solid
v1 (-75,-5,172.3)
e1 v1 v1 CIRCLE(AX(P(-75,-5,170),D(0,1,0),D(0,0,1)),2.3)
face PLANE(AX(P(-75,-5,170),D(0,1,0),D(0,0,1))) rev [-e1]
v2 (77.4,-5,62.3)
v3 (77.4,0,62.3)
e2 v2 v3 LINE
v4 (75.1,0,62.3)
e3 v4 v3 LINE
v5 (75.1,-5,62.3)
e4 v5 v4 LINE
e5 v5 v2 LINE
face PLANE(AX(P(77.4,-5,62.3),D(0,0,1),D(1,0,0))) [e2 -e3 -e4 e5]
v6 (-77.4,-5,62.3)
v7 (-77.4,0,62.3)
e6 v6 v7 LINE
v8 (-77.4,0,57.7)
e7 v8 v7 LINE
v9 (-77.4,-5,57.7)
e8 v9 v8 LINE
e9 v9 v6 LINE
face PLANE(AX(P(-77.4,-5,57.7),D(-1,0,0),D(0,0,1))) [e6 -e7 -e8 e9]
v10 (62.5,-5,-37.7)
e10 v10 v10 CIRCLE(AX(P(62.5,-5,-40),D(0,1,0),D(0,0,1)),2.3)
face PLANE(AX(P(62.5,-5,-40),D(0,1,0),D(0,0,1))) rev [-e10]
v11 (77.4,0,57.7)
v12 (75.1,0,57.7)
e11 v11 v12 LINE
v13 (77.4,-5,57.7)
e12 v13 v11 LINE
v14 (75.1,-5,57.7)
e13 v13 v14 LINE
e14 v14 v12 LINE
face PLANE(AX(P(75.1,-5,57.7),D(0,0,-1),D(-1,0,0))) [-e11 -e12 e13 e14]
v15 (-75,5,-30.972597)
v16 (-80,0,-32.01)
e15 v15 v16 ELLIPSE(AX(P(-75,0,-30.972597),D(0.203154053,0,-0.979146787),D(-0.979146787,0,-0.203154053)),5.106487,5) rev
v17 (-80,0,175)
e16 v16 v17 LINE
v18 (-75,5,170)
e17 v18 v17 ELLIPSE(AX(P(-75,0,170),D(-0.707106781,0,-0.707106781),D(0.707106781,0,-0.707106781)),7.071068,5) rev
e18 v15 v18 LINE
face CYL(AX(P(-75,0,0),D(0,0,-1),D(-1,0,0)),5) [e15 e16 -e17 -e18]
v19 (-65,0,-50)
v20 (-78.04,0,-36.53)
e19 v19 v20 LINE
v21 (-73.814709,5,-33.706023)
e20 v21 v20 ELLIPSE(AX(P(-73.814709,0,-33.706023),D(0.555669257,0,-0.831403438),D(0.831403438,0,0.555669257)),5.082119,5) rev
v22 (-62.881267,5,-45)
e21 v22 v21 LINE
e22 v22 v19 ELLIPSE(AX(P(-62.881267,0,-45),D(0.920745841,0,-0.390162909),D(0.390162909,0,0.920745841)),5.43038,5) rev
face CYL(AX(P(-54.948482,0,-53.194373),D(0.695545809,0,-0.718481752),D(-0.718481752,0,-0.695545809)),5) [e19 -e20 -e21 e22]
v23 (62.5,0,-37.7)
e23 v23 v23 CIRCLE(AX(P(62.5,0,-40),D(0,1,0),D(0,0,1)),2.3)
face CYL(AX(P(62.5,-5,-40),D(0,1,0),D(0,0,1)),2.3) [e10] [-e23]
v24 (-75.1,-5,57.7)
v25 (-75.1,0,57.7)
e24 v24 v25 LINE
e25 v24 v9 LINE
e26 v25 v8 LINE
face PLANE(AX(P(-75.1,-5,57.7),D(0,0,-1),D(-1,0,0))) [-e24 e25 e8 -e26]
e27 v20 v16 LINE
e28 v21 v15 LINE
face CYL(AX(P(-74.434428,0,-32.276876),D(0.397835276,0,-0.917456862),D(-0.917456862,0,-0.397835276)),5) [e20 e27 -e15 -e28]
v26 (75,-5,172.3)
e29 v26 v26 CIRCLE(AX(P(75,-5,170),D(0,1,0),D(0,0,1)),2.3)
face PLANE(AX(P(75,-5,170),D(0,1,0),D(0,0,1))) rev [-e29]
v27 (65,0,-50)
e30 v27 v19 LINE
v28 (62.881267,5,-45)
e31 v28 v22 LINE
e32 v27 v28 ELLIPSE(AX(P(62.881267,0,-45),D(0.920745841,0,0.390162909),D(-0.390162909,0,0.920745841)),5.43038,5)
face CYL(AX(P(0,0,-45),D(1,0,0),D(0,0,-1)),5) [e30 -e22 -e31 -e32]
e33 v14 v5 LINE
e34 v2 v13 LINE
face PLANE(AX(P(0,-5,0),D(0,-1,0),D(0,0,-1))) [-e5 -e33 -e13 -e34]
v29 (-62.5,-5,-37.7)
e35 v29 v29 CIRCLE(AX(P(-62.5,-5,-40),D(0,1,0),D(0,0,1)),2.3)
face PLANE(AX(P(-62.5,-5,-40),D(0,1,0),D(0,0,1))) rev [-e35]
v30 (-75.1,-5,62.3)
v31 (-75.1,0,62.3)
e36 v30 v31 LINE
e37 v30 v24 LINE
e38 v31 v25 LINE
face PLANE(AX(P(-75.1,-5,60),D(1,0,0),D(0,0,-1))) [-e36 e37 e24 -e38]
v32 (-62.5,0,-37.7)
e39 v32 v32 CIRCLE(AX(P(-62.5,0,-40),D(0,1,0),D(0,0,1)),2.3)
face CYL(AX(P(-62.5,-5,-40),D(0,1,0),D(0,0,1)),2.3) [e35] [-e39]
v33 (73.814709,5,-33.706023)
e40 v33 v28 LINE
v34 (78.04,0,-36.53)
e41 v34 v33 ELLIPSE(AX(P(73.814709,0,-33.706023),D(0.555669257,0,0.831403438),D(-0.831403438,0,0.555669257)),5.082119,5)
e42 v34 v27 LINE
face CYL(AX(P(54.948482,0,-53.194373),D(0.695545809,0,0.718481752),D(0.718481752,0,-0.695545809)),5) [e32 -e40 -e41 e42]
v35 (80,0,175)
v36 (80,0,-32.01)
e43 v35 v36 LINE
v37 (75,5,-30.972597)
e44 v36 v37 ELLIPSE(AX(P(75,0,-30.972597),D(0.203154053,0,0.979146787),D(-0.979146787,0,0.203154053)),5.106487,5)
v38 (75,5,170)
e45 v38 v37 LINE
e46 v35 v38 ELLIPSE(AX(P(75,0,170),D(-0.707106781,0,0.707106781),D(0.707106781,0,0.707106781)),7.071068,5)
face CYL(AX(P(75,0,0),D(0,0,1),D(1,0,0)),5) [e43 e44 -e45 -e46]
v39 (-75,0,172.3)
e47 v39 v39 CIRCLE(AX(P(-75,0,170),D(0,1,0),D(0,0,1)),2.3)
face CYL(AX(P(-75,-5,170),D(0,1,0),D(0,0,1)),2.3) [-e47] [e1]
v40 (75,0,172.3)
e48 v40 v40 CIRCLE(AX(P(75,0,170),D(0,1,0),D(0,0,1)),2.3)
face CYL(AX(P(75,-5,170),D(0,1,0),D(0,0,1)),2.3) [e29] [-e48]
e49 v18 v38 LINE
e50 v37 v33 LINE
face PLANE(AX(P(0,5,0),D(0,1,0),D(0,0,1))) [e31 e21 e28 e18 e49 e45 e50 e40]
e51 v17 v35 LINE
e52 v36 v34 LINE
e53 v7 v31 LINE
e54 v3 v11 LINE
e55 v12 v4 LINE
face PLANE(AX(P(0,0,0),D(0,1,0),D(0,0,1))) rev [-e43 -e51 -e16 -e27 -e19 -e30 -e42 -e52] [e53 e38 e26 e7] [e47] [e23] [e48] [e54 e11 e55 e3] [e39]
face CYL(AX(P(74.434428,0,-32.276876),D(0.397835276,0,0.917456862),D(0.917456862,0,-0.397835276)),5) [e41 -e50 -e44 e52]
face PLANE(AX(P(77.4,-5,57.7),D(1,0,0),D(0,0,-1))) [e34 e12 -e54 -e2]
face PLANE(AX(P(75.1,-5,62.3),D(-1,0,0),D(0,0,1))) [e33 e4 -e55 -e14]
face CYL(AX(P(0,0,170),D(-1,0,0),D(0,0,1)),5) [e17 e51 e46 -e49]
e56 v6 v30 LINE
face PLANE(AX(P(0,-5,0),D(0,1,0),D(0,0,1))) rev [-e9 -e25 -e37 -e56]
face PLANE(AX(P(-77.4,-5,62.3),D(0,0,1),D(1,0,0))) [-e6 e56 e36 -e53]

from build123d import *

# Parameters (mm, degrees)
BOSS_EXTRUDE1_DEPTH = 5
FILLET1_R           = 5
SKETCH3_R           = 2.3
BOSS_EXTRUDE2_DEPTH = 5


with BuildPart() as part:
    # Lid → Boss-Extrude1 (new body)
    with BuildSketch(Plane(origin=(0, 0, 0), x_dir=(1, 0, 0), z_dir=(0, 1, 0))):
        Polygon((-80, -175), (80, -175), (80, 30), (80, 32.01), (78.04, 36.53), (65, 50), (-65, 50), (-78.04, 36.53), (-80, 32.01), (-80, 30), align=None)
    extrude(amount=BOSS_EXTRUDE1_DEPTH)

    # Fillet1
    fillet1_edges = [part.edges().sort_by_distance(p)[0] for p in [
        (0, 5, 175),
        (-79.02, 5, -34.27),
        (-80, 5, 71.495),
        (-71.52, 5, -43.265),
        (0, 5, -50),
        (71.52, 5, -43.265),
        (79.02, 5, -34.27),
        (80, 5, 71.495),
    ]]
    fillet(fillet1_edges, radius=FILLET1_R - 0.0001)  # a hair under: the kernel refuses the full size

    # Sketch3 → Boss-Extrude2 (add)
    with BuildSketch(Plane(origin=(0, 0, 0), x_dir=(1, 0, 0), z_dir=(0, 1, 0))):
        with Locations(Location((-62.5, 40, 0), (0, 0, 270))):
            Circle(SKETCH3_R)
        with Locations(Location((62.5, 40, 0), (0, 0, 270))):
            Circle(SKETCH3_R)
        with Locations(Location((75, -170, 0), (0, 0, 270))):
            Circle(SKETCH3_R)
        with Locations(Location((-75, -170, 0), (0, 0, 270))):
            Circle(SKETCH3_R)
        Polygon((-77.4, -57.7), (-77.4, -62.3), (-75.1, -62.3), (-75.1, -60), (-75.1, -57.7), align=None)
        Polygon((75.1, -57.7), (77.4, -57.7), (77.4, -62.3), (75.1, -62.3), (75.1, -60), align=None)
    extrude(amount=-BOSS_EXTRUDE2_DEPTH)


solid = part.part
